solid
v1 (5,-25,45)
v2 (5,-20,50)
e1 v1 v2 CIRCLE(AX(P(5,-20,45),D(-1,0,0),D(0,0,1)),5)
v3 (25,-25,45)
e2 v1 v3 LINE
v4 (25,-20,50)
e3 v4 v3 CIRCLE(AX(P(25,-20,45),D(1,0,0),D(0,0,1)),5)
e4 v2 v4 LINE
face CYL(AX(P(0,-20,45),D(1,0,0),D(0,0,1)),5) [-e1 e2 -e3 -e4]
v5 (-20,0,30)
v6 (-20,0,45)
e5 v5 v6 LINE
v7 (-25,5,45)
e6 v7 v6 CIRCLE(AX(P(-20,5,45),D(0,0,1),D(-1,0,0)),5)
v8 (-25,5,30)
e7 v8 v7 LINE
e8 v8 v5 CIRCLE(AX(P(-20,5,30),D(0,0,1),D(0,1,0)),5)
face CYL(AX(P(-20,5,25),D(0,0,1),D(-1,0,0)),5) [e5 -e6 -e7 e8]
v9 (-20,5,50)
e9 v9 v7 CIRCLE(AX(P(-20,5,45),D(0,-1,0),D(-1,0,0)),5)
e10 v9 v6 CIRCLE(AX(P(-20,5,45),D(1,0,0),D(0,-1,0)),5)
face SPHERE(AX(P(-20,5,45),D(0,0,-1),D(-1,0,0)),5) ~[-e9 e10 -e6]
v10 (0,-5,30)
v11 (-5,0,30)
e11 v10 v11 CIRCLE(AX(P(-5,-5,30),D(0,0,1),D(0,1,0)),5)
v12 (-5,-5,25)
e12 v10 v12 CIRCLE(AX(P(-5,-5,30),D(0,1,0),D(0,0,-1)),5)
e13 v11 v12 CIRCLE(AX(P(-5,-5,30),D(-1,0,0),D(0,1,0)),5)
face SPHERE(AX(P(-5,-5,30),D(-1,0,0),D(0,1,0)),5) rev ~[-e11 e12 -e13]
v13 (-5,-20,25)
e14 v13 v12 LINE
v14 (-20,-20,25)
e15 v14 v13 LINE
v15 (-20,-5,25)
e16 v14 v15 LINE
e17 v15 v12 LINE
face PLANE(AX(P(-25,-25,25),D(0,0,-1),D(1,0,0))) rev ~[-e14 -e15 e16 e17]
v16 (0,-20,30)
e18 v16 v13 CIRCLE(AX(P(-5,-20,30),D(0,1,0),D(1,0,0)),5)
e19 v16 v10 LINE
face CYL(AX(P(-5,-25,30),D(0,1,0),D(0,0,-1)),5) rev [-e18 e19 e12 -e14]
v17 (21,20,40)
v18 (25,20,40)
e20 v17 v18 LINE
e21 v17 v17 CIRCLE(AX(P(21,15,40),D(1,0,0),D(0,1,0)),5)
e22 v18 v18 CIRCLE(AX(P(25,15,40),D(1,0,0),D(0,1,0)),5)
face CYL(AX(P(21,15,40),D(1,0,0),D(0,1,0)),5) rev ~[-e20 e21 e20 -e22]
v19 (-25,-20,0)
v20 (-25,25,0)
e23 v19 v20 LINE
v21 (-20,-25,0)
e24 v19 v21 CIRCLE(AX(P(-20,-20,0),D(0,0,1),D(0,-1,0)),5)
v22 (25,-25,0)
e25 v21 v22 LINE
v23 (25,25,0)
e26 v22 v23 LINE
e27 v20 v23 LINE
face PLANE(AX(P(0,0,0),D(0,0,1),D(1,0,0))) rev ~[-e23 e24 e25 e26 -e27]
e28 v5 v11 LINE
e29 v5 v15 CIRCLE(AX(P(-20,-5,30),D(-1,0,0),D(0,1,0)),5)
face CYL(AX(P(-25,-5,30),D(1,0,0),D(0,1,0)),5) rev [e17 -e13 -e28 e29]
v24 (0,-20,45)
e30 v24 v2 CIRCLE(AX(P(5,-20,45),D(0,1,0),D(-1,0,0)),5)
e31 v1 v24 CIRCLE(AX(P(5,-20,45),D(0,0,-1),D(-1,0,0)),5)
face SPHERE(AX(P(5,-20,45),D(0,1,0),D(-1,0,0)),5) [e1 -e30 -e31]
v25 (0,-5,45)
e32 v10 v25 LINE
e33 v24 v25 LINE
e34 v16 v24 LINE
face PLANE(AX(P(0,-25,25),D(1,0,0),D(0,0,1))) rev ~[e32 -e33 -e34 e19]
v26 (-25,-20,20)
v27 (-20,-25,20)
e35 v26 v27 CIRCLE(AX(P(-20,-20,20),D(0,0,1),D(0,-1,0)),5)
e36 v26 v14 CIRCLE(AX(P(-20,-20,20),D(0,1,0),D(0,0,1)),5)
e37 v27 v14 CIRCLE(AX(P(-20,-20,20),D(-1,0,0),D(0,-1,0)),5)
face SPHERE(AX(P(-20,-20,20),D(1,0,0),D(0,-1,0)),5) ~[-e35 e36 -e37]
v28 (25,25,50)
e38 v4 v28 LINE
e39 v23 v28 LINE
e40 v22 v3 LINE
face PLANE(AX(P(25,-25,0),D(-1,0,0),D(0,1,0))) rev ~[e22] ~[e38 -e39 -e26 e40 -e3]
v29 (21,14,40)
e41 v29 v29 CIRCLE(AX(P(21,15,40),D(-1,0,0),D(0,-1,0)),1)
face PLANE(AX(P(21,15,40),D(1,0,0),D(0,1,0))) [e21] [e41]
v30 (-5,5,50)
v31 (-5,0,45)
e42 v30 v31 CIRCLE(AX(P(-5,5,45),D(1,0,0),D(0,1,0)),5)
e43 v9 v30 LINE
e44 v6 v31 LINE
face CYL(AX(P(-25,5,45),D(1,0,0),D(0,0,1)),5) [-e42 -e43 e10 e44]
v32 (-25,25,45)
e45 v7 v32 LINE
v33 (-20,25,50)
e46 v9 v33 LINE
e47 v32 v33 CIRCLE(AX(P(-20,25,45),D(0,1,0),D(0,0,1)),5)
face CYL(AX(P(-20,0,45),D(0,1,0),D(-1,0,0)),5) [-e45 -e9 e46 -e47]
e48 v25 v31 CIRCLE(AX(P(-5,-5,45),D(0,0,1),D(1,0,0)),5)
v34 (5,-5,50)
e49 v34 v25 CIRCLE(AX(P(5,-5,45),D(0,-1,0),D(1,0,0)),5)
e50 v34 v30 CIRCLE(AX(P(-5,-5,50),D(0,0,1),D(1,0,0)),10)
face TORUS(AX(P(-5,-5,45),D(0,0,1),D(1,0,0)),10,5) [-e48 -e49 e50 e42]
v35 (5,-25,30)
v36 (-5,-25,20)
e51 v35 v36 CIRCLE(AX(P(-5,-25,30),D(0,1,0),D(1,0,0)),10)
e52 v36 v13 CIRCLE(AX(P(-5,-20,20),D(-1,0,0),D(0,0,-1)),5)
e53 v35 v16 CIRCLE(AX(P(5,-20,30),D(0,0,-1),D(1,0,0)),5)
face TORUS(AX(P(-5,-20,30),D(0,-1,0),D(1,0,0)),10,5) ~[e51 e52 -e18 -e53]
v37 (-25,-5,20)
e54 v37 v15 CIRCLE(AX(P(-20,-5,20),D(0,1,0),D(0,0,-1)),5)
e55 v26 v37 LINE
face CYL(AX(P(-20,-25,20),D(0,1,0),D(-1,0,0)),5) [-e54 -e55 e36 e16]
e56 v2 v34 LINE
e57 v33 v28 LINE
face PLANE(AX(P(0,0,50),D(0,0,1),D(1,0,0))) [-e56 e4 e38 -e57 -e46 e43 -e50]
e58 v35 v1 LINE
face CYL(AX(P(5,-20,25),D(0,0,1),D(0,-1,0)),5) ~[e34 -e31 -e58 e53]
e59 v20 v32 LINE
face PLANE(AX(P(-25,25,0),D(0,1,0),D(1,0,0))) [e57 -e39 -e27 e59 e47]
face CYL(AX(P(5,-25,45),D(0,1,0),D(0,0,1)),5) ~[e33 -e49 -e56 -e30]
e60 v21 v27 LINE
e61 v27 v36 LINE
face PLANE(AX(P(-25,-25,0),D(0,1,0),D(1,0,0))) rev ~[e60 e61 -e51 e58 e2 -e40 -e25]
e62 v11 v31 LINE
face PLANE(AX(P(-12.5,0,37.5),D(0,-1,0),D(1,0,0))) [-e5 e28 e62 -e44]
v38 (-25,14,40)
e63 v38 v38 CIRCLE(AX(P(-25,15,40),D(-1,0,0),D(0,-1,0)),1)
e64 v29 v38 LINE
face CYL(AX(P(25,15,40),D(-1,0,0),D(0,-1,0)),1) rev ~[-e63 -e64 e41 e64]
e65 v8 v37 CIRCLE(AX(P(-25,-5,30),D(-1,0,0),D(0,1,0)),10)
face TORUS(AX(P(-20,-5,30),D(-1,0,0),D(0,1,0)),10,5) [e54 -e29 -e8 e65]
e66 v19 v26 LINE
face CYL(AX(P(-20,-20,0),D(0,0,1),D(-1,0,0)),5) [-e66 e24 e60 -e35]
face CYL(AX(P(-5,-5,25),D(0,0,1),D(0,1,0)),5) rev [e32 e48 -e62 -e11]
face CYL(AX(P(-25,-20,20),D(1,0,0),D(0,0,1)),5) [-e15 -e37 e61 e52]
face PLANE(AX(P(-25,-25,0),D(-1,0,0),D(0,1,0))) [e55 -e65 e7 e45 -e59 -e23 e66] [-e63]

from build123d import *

# Parameters (mm, degrees)
F0_W           = 50
F0_H           = 50
F1_DEPTH       = 50
F3_D           = 2
F3_CBORE_D     = 10
F3_CBORE_DEPTH = 4
F4_W           = 25
F4_H           = 25
F5_DEPTH       = 25
F6_R           = 5


with BuildPart() as f1:
    # F0 (on Top) → F1 (new body)
    with BuildSketch(Plane.XY):
        Rectangle(F0_W, F0_H)
    extrude(amount=F1_DEPTH)

    # F3 (through all)
    with Locations(Plane.YZ.offset(25)):
        with Locations((15, 40)):
            CounterBoreHole(F3_D / 2, F3_CBORE_D / 2, F3_CBORE_DEPTH)

    # F4 (on face) → F5 (cut)
    with BuildSketch(Plane.XZ.offset(25)):
        with Locations((-12.5, 37.5)):
            Rectangle(F4_W, F4_H)
    extrude(amount=-F5_DEPTH, mode=Mode.SUBTRACT)

    # F6
    f6_edges = [f1.edges().sort_by_distance(p)[0] for p in [
        (-12.5, 0, 25),
        (-25, 0, 37.5),
        (0, 0, 37.5),
        (0, -12.5, 50),
        (0, -25, 37.5),
        (-12.5, -25, 25),
        (0, -12.5, 25),
        (-25, 12.5, 50),
        (12.5, -25, 50),
        (-25, -25, 12.5),
        (-12.5, 0, 50),
        (-25, -12.5, 25),
    ]]
    fillet(f6_edges, radius=F6_R)


solid = f1.part
